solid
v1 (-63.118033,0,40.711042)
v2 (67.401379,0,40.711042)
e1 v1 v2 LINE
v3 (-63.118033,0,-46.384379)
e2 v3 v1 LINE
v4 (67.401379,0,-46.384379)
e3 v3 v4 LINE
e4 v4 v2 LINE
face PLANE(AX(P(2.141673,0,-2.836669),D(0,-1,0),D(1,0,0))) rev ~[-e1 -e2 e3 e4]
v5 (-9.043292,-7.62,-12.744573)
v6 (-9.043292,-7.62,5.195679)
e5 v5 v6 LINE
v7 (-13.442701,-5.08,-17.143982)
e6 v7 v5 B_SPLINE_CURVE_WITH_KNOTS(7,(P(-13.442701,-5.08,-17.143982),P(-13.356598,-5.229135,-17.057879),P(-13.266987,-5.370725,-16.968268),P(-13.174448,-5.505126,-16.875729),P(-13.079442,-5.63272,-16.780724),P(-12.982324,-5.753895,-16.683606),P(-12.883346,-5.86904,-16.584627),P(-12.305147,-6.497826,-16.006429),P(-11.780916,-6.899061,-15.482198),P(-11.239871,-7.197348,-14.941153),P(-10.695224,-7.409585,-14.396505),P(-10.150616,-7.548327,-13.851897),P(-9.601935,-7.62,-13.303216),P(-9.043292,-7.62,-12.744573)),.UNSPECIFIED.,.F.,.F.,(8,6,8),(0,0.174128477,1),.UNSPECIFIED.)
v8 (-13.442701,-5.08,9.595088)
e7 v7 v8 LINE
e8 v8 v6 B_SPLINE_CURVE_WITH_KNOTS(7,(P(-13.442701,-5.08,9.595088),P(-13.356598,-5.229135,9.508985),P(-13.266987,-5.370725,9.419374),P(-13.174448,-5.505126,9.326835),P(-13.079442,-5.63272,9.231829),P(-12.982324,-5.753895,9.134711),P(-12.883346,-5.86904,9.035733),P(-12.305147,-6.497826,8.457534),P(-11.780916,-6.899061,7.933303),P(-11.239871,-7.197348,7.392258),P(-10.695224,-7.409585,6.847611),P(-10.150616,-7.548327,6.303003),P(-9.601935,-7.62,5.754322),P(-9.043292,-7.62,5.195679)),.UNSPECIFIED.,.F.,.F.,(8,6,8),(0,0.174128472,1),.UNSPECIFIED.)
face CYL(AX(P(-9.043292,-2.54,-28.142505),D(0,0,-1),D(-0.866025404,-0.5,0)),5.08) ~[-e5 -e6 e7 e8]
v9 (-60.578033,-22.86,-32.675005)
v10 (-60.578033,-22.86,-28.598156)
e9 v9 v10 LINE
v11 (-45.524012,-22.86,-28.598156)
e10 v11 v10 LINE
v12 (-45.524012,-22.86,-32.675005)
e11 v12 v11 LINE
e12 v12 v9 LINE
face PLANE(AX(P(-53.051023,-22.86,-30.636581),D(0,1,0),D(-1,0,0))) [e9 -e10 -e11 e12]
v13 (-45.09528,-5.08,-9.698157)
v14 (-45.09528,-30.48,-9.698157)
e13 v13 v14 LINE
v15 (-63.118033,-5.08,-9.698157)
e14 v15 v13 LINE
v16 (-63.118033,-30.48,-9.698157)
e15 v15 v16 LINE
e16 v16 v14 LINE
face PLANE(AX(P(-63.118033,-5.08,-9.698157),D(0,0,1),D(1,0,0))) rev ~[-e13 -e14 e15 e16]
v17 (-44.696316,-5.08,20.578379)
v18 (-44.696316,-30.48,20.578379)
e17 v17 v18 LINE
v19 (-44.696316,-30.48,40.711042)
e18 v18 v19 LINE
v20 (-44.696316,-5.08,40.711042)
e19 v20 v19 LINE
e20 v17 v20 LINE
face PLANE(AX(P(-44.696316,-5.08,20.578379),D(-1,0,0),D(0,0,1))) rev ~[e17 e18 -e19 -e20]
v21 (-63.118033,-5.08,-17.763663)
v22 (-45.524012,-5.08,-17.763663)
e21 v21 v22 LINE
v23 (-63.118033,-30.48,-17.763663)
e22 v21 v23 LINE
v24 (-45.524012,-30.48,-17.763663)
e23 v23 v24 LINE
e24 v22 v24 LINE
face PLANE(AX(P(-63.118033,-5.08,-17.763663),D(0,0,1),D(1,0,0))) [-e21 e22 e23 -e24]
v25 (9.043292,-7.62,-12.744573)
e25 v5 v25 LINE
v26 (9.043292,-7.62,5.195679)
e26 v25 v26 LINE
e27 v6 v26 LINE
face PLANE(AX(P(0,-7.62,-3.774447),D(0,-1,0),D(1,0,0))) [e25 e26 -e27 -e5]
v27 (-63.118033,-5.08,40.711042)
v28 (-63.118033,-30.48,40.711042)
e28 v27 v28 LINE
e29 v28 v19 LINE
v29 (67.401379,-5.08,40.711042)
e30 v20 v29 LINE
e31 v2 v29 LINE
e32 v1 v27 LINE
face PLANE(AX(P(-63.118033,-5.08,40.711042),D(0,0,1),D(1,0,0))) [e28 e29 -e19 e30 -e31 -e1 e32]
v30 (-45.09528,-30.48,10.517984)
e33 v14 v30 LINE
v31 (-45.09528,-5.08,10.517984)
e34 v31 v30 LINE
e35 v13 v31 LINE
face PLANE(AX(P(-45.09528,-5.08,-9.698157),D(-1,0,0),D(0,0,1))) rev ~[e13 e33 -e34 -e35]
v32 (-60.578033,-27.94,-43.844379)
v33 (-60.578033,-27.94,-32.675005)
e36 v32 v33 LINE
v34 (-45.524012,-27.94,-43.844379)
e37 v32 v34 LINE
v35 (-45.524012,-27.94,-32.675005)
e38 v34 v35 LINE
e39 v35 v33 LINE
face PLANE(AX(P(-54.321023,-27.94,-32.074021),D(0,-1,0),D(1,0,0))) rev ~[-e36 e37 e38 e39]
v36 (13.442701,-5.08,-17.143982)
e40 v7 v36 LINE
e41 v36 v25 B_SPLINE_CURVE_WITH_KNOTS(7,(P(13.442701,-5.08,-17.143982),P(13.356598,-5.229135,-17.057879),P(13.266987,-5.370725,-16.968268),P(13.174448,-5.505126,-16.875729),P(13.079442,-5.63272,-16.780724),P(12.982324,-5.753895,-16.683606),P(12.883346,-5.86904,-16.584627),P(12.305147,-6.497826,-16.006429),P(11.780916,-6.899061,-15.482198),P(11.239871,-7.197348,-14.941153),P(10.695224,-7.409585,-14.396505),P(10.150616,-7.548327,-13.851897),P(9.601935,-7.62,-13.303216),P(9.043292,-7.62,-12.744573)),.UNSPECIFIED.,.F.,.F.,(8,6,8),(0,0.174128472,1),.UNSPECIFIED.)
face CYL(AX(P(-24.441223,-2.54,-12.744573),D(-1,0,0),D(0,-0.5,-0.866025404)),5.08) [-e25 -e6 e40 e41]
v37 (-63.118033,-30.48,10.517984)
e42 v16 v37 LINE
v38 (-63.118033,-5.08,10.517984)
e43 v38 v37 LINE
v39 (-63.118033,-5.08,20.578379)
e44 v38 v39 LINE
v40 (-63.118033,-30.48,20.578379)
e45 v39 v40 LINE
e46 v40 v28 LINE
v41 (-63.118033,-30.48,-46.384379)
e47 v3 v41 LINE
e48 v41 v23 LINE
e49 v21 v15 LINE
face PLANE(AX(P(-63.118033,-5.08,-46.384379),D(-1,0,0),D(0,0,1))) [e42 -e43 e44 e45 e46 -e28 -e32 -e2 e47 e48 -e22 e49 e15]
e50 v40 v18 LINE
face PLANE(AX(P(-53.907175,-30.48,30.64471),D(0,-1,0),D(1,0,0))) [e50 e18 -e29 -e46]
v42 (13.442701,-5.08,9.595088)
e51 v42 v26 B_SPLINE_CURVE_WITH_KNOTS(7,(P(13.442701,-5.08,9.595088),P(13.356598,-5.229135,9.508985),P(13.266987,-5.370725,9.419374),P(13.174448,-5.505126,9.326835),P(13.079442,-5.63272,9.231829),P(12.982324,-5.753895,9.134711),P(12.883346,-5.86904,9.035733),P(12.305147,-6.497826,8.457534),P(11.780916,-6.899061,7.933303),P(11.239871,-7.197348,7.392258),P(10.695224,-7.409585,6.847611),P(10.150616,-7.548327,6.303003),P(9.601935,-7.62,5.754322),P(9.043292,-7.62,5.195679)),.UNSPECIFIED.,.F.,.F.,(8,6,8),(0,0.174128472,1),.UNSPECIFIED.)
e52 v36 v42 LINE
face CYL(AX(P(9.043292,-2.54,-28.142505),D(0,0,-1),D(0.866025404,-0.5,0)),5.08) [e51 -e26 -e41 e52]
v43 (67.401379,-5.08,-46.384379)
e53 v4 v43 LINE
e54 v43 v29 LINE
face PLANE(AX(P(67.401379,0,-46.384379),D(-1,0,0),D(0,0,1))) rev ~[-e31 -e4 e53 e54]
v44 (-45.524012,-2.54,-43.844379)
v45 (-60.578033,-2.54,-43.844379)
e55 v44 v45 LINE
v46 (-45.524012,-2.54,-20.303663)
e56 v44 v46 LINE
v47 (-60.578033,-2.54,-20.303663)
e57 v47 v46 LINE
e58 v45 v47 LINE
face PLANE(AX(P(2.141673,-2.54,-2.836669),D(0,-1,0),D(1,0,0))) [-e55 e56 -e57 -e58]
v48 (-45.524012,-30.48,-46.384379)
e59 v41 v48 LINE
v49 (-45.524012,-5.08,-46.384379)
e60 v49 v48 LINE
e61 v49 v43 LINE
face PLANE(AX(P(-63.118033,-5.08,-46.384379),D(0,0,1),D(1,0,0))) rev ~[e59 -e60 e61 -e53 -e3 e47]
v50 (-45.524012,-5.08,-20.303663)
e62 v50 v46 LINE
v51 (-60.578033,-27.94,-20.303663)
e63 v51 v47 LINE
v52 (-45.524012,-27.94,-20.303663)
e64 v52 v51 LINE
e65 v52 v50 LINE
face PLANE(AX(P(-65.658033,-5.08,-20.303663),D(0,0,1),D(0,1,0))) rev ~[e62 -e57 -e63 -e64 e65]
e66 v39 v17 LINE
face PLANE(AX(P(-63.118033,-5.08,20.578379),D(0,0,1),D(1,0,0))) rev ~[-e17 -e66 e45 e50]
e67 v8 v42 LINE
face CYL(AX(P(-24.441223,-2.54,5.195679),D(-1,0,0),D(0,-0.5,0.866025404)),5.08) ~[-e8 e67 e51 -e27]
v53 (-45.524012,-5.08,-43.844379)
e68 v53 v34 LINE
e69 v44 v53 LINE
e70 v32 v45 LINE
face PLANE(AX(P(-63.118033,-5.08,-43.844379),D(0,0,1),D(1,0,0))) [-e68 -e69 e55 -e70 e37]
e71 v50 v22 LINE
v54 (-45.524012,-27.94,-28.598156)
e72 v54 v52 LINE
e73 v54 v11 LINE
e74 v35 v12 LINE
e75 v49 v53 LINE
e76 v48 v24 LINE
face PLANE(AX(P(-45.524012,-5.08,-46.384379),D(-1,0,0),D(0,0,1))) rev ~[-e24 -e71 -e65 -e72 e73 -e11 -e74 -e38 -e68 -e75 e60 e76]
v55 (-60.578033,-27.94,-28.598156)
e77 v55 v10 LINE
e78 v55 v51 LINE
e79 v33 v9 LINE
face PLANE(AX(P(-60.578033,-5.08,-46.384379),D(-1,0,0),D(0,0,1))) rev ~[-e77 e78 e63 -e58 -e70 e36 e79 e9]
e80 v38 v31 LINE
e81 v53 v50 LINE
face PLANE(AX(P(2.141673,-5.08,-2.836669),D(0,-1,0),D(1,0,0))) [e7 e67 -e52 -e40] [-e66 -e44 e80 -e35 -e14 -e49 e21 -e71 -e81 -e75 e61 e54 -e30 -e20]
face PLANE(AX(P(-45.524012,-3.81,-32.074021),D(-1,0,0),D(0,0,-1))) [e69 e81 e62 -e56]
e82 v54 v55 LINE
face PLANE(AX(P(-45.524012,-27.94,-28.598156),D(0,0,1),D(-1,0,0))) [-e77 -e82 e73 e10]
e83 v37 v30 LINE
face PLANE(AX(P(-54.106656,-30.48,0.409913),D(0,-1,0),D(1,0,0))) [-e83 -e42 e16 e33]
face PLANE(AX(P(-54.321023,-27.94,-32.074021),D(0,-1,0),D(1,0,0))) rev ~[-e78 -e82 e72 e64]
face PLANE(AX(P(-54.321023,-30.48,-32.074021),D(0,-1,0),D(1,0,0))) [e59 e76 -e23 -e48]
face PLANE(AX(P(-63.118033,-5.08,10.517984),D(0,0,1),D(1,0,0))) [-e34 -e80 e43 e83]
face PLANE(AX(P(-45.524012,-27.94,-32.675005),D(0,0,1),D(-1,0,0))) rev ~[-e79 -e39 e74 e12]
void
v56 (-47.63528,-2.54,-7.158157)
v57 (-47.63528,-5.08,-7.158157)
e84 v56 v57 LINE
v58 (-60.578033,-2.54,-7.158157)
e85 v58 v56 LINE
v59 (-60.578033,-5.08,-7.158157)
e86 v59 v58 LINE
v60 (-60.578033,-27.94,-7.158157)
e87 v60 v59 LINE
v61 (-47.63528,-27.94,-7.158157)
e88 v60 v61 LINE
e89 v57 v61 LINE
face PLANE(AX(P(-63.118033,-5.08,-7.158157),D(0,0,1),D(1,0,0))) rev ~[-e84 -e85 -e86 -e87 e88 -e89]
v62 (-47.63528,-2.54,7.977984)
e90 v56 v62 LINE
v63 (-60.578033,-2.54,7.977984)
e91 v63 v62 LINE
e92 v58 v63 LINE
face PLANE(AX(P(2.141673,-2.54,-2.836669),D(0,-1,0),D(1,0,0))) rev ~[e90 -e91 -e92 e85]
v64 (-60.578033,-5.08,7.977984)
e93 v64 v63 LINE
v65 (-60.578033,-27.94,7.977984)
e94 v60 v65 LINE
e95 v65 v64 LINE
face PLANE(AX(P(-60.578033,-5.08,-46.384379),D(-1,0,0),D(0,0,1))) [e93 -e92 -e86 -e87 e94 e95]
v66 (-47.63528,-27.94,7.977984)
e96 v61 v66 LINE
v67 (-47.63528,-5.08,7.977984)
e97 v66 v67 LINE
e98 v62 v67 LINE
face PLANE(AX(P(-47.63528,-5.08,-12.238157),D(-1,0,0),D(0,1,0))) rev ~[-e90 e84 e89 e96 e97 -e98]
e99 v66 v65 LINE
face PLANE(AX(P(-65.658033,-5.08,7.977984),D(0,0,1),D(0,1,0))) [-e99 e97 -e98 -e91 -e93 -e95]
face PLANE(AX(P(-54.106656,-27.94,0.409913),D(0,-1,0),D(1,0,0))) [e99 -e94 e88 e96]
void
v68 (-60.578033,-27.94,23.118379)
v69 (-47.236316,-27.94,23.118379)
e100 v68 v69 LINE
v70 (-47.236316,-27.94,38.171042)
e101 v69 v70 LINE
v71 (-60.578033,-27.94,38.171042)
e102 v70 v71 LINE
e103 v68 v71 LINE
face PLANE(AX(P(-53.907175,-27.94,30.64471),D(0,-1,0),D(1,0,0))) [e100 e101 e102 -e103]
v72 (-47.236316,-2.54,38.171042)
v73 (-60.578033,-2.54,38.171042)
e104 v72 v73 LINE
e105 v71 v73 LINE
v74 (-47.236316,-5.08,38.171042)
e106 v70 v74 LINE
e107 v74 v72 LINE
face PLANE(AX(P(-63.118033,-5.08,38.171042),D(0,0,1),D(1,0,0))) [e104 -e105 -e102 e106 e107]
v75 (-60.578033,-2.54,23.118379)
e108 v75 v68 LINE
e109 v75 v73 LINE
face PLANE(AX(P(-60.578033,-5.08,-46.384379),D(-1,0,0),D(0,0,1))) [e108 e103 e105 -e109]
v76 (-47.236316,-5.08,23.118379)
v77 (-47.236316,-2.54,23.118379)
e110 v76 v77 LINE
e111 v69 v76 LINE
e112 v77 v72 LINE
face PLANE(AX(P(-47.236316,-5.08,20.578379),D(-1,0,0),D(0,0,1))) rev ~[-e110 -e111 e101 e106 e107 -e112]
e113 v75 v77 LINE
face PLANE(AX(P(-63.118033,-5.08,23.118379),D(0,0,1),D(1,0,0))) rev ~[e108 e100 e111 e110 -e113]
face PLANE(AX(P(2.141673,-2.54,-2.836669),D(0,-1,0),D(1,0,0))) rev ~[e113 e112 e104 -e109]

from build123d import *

# Parameters (mm, degrees)
F0_W         = 130.5194124579
F0_H         = 87.0954208076
F1_DEPTH     = 5.08
F2_W         = 18.4217169881
F2_H         = 20.1326627284
F3_DEPTH     = 25.4
F4_W         = 18.0227532983
F4_H         = 20.2161408961
F5_DEPTH     = 25.4
F6_W         = 17.5940208137
F6_H         = 28.6207161844
F7_DEPTH     = 25.4
F8_T         = 2.54
F8_T3_DEPTH  = 22.6740208137
F8_T5_DEPTH  = 23.1027532983
F8_T7_DEPTH  = 25.2961408961
F8_T9_DEPTH  = 23.5017169881
F8_T11_DEPTH = 25.2126627284
F9_W         = 15.0540208137
F9_H         = 4.0768496692
F10_DEPTH    = 5.08
F11_W        = 26.8854014575
F11_H        = 26.7390697263
F12_DEPTH    = 2.54
F13_T1_DEPTH = 48.8824467137
F13_T3_DEPTH = 48.7361149824


# Not quite as in the source:
# - a fillet or chamfer that OpenCascade refuses, or shapes differently, is made with other operations: its cross-section is extruded or revolved along the edge and cut away or added
# - a shell that OpenCascade refuses in one call is made with other operations: the cavity is built on its own and cut out


with BuildPart() as f1:
    # F0 (on Front) → F1 (new body)
    with BuildSketch(Plane.XZ):
        with Locations((2.1416731179, -2.8366688639)):
            Rectangle(F0_W, F0_H)
    extrude(amount=F1_DEPTH)

    # F2 (on face) → F3 (join)
    with BuildSketch(Plane.XZ.offset(5.08)):
        with Locations((-53.9071746171, 30.6447101757)):
            Rectangle(F2_W, F2_H)
    extrude(amount=F3_DEPTH)

    # F4 (on face) → F5 (join)
    with BuildSketch(Plane.XZ.offset(5.08)):
        with Locations((-54.106656462, 0.4099132493)):
            Rectangle(F4_W, F4_H)
    extrude(amount=F5_DEPTH)

    # F6 (on face) → F7 (join)
    with BuildSketch(Plane.XZ.offset(5.08)):
        with Locations((-54.3210227042, -32.0740211755)):
            Rectangle(F6_W, F6_H)
    extrude(amount=F7_DEPTH)

    # F8: shell of thickness 2.54, made by hand


with BuildPart() as f8_core1:
    # F8_t2: copy of F1
    add(f1.part)

    # the walls: a layer under each face that stays
    f8_faces = [f8_core1.faces().sort_by_distance(p)[0] for p in [
        (-63.1180331111, -15.24, -2.8366688639),
        (2.1416731179, 0, -2.8366688639),
        (67.4013793468, -2.54, -2.8366688639),
        (-53.7952179355, -28.3028571429, -46.3843792677),
        (-54.3210227042, -30.48, -32.0740211755),
        (-54.3210227042, -17.78, -17.7636630833),
        (-54.106656462, -17.78, -9.6981571987),
        (-45.0952798128, -17.78, 0.4099132493),
        (-54.106656462, -30.48, 0.4099132493),
        (-54.106656462, -17.78, 10.5179836974),
        (2.1416731179, -5.08, -2.8366688639),
        (-44.696316123, -17.78, 30.6447101757),
        (-53.9071746171, -17.78, 20.5783788115),
        (-53.9071746171, -30.48, 30.6447101757),
        (58.0785641713, -2.1771428571, 40.7110415399),
    ]]
    thicken(f8_faces, amount=-F8_T, mode=Mode.SUBTRACT)

    # F8_s4 → F8_t3 (cut)
    with BuildSketch(Plane.YZ.offset(-65.6580331111)):
        Polygon((-5.1054, -17.7382630833), (-5.08, -20.3036630833), (-2.54, -20.3036630833), (-2.54, -17.7636630833), align=None)
    extrude(amount=F8_T3_DEPTH, mode=Mode.SUBTRACT)

    # F8_s6 → F8_t5 (cut)
    with BuildSketch(Plane.YZ.offset(-65.6580331111)):
        Polygon((-5.1054, -9.7235571987), (-5.08, -7.1581571987), (-2.54, -7.1581571987), (-2.54, -9.6981571987), align=None)
        Polygon((-5.1054, 10.5433836974), (-5.08, 7.9779836974), (-2.54, 7.9779836974), (-2.54, 10.5179836974), align=None)
    extrude(amount=F8_T5_DEPTH, mode=Mode.SUBTRACT)

    # F8_s8 → F8_t7 (cut)
    with BuildSketch(Plane.XY.offset(-12.2381571987)):
        Polygon((-45.0698798128, -5.1054), (-47.6352798128, -5.08), (-47.6352798128, -2.54), (-45.0952798128, -2.54), align=None)
    extrude(amount=F8_T7_DEPTH, mode=Mode.SUBTRACT)

    # F8_s10 → F8_t9 (cut)
    with BuildSketch(Plane.YZ.offset(-65.6580331111)):
        Polygon((-5.1054, 20.5529788115), (-2.54, 20.5783788115), (-2.54, 23.1183788115), (-5.08, 23.1183788115), align=None)
    extrude(amount=F8_T9_DEPTH, mode=Mode.SUBTRACT)

    # F8_s12 → F8_t11 (cut)
    with BuildSketch(Plane.XY.offset(18.0383788115)):
        Polygon((-44.670916123, -5.1054), (-44.696316123, -2.54), (-47.236316123, -2.54), (-47.236316123, -5.08), align=None)
    extrude(amount=F8_T11_DEPTH, mode=Mode.SUBTRACT)


with BuildPart() as f1_1:
    add(f1.part)

    # what is left inside the walls is the cavity
    f8_cavity = [f8_core1.part.solids().sort_by_distance(p)[0] for p in [
        (-60.552633, -19.473333, 30.64471),
        (-60.552633, -19.473333, -32.074021),
        (-60.552633, -19.473333, 0.409913),
    ]]
    add(f8_cavity, mode=Mode.SUBTRACT)

    # F9 (on face) → F10 (join)
    with BuildSketch(Plane(origin=(0, -27.94, 0), x_dir=(-1, 0, 0), z_dir=(0, 1, 0))):
        with Locations((53.0510227042, -30.6365806609)):
            Rectangle(F9_W, F9_H)
    extrude(amount=F10_DEPTH)

    # F11 (on face) → F12 (join)
    with BuildSketch(Plane.XZ.offset(5.08)):
        with Locations((0, -3.7744471338)):
            Rectangle(F11_W, F11_H)
    extrude(amount=F12_DEPTH)

    # F13: fillet of radius 5.08 on 4 edges, made by hand

    # F13_s2 → F13_t1 (cut)
    with BuildSketch(Plane.YZ.offset(-24.4412233568)):
        with BuildLine():
            ThreePointArc((-5.08, -17.1439819969), (-6.9394090512, -15.2845729457), (-7.62, -12.7445729457))
            Line((-7.62, -12.7445729457), (-7.62, -17.1439819969))
            Line((-7.62, -17.1439819969), (-5.08, -17.1439819969))
        make_face()
        with BuildLine():
            ThreePointArc((-5.08, 9.5950877294), (-6.9394090512, 7.7356786782), (-7.62, 5.1956786782))
            Line((-7.62, 5.1956786782), (-7.62, 9.5950877294))
            Line((-7.62, 9.5950877294), (-5.08, 9.5950877294))
        make_face()
    extrude(amount=F13_T1_DEPTH, mode=Mode.SUBTRACT)

    # F13_s4 → F13_t3 (cut)
    with BuildSketch(Plane.XY.offset(-28.142504625)):
        with BuildLine():
            ThreePointArc((-13.4427007288, -5.08), (-11.5832916775, -6.9394090512), (-9.0432916775, -7.62))
            Line((-9.0432916775, -7.62), (-13.4427007288, -7.62))
            Line((-13.4427007288, -7.62), (-13.4427007288, -5.08))
        make_face()
        with BuildLine():
            ThreePointArc((13.4427007288, -5.08), (11.5832916775, -6.9394090512), (9.0432916775, -7.62))
            Line((9.0432916775, -7.62), (13.4427007288, -7.62))
            Line((13.4427007288, -7.62), (13.4427007288, -5.08))
        make_face()
    extrude(amount=F13_T3_DEPTH, mode=Mode.SUBTRACT)


solid = f1_1.part
